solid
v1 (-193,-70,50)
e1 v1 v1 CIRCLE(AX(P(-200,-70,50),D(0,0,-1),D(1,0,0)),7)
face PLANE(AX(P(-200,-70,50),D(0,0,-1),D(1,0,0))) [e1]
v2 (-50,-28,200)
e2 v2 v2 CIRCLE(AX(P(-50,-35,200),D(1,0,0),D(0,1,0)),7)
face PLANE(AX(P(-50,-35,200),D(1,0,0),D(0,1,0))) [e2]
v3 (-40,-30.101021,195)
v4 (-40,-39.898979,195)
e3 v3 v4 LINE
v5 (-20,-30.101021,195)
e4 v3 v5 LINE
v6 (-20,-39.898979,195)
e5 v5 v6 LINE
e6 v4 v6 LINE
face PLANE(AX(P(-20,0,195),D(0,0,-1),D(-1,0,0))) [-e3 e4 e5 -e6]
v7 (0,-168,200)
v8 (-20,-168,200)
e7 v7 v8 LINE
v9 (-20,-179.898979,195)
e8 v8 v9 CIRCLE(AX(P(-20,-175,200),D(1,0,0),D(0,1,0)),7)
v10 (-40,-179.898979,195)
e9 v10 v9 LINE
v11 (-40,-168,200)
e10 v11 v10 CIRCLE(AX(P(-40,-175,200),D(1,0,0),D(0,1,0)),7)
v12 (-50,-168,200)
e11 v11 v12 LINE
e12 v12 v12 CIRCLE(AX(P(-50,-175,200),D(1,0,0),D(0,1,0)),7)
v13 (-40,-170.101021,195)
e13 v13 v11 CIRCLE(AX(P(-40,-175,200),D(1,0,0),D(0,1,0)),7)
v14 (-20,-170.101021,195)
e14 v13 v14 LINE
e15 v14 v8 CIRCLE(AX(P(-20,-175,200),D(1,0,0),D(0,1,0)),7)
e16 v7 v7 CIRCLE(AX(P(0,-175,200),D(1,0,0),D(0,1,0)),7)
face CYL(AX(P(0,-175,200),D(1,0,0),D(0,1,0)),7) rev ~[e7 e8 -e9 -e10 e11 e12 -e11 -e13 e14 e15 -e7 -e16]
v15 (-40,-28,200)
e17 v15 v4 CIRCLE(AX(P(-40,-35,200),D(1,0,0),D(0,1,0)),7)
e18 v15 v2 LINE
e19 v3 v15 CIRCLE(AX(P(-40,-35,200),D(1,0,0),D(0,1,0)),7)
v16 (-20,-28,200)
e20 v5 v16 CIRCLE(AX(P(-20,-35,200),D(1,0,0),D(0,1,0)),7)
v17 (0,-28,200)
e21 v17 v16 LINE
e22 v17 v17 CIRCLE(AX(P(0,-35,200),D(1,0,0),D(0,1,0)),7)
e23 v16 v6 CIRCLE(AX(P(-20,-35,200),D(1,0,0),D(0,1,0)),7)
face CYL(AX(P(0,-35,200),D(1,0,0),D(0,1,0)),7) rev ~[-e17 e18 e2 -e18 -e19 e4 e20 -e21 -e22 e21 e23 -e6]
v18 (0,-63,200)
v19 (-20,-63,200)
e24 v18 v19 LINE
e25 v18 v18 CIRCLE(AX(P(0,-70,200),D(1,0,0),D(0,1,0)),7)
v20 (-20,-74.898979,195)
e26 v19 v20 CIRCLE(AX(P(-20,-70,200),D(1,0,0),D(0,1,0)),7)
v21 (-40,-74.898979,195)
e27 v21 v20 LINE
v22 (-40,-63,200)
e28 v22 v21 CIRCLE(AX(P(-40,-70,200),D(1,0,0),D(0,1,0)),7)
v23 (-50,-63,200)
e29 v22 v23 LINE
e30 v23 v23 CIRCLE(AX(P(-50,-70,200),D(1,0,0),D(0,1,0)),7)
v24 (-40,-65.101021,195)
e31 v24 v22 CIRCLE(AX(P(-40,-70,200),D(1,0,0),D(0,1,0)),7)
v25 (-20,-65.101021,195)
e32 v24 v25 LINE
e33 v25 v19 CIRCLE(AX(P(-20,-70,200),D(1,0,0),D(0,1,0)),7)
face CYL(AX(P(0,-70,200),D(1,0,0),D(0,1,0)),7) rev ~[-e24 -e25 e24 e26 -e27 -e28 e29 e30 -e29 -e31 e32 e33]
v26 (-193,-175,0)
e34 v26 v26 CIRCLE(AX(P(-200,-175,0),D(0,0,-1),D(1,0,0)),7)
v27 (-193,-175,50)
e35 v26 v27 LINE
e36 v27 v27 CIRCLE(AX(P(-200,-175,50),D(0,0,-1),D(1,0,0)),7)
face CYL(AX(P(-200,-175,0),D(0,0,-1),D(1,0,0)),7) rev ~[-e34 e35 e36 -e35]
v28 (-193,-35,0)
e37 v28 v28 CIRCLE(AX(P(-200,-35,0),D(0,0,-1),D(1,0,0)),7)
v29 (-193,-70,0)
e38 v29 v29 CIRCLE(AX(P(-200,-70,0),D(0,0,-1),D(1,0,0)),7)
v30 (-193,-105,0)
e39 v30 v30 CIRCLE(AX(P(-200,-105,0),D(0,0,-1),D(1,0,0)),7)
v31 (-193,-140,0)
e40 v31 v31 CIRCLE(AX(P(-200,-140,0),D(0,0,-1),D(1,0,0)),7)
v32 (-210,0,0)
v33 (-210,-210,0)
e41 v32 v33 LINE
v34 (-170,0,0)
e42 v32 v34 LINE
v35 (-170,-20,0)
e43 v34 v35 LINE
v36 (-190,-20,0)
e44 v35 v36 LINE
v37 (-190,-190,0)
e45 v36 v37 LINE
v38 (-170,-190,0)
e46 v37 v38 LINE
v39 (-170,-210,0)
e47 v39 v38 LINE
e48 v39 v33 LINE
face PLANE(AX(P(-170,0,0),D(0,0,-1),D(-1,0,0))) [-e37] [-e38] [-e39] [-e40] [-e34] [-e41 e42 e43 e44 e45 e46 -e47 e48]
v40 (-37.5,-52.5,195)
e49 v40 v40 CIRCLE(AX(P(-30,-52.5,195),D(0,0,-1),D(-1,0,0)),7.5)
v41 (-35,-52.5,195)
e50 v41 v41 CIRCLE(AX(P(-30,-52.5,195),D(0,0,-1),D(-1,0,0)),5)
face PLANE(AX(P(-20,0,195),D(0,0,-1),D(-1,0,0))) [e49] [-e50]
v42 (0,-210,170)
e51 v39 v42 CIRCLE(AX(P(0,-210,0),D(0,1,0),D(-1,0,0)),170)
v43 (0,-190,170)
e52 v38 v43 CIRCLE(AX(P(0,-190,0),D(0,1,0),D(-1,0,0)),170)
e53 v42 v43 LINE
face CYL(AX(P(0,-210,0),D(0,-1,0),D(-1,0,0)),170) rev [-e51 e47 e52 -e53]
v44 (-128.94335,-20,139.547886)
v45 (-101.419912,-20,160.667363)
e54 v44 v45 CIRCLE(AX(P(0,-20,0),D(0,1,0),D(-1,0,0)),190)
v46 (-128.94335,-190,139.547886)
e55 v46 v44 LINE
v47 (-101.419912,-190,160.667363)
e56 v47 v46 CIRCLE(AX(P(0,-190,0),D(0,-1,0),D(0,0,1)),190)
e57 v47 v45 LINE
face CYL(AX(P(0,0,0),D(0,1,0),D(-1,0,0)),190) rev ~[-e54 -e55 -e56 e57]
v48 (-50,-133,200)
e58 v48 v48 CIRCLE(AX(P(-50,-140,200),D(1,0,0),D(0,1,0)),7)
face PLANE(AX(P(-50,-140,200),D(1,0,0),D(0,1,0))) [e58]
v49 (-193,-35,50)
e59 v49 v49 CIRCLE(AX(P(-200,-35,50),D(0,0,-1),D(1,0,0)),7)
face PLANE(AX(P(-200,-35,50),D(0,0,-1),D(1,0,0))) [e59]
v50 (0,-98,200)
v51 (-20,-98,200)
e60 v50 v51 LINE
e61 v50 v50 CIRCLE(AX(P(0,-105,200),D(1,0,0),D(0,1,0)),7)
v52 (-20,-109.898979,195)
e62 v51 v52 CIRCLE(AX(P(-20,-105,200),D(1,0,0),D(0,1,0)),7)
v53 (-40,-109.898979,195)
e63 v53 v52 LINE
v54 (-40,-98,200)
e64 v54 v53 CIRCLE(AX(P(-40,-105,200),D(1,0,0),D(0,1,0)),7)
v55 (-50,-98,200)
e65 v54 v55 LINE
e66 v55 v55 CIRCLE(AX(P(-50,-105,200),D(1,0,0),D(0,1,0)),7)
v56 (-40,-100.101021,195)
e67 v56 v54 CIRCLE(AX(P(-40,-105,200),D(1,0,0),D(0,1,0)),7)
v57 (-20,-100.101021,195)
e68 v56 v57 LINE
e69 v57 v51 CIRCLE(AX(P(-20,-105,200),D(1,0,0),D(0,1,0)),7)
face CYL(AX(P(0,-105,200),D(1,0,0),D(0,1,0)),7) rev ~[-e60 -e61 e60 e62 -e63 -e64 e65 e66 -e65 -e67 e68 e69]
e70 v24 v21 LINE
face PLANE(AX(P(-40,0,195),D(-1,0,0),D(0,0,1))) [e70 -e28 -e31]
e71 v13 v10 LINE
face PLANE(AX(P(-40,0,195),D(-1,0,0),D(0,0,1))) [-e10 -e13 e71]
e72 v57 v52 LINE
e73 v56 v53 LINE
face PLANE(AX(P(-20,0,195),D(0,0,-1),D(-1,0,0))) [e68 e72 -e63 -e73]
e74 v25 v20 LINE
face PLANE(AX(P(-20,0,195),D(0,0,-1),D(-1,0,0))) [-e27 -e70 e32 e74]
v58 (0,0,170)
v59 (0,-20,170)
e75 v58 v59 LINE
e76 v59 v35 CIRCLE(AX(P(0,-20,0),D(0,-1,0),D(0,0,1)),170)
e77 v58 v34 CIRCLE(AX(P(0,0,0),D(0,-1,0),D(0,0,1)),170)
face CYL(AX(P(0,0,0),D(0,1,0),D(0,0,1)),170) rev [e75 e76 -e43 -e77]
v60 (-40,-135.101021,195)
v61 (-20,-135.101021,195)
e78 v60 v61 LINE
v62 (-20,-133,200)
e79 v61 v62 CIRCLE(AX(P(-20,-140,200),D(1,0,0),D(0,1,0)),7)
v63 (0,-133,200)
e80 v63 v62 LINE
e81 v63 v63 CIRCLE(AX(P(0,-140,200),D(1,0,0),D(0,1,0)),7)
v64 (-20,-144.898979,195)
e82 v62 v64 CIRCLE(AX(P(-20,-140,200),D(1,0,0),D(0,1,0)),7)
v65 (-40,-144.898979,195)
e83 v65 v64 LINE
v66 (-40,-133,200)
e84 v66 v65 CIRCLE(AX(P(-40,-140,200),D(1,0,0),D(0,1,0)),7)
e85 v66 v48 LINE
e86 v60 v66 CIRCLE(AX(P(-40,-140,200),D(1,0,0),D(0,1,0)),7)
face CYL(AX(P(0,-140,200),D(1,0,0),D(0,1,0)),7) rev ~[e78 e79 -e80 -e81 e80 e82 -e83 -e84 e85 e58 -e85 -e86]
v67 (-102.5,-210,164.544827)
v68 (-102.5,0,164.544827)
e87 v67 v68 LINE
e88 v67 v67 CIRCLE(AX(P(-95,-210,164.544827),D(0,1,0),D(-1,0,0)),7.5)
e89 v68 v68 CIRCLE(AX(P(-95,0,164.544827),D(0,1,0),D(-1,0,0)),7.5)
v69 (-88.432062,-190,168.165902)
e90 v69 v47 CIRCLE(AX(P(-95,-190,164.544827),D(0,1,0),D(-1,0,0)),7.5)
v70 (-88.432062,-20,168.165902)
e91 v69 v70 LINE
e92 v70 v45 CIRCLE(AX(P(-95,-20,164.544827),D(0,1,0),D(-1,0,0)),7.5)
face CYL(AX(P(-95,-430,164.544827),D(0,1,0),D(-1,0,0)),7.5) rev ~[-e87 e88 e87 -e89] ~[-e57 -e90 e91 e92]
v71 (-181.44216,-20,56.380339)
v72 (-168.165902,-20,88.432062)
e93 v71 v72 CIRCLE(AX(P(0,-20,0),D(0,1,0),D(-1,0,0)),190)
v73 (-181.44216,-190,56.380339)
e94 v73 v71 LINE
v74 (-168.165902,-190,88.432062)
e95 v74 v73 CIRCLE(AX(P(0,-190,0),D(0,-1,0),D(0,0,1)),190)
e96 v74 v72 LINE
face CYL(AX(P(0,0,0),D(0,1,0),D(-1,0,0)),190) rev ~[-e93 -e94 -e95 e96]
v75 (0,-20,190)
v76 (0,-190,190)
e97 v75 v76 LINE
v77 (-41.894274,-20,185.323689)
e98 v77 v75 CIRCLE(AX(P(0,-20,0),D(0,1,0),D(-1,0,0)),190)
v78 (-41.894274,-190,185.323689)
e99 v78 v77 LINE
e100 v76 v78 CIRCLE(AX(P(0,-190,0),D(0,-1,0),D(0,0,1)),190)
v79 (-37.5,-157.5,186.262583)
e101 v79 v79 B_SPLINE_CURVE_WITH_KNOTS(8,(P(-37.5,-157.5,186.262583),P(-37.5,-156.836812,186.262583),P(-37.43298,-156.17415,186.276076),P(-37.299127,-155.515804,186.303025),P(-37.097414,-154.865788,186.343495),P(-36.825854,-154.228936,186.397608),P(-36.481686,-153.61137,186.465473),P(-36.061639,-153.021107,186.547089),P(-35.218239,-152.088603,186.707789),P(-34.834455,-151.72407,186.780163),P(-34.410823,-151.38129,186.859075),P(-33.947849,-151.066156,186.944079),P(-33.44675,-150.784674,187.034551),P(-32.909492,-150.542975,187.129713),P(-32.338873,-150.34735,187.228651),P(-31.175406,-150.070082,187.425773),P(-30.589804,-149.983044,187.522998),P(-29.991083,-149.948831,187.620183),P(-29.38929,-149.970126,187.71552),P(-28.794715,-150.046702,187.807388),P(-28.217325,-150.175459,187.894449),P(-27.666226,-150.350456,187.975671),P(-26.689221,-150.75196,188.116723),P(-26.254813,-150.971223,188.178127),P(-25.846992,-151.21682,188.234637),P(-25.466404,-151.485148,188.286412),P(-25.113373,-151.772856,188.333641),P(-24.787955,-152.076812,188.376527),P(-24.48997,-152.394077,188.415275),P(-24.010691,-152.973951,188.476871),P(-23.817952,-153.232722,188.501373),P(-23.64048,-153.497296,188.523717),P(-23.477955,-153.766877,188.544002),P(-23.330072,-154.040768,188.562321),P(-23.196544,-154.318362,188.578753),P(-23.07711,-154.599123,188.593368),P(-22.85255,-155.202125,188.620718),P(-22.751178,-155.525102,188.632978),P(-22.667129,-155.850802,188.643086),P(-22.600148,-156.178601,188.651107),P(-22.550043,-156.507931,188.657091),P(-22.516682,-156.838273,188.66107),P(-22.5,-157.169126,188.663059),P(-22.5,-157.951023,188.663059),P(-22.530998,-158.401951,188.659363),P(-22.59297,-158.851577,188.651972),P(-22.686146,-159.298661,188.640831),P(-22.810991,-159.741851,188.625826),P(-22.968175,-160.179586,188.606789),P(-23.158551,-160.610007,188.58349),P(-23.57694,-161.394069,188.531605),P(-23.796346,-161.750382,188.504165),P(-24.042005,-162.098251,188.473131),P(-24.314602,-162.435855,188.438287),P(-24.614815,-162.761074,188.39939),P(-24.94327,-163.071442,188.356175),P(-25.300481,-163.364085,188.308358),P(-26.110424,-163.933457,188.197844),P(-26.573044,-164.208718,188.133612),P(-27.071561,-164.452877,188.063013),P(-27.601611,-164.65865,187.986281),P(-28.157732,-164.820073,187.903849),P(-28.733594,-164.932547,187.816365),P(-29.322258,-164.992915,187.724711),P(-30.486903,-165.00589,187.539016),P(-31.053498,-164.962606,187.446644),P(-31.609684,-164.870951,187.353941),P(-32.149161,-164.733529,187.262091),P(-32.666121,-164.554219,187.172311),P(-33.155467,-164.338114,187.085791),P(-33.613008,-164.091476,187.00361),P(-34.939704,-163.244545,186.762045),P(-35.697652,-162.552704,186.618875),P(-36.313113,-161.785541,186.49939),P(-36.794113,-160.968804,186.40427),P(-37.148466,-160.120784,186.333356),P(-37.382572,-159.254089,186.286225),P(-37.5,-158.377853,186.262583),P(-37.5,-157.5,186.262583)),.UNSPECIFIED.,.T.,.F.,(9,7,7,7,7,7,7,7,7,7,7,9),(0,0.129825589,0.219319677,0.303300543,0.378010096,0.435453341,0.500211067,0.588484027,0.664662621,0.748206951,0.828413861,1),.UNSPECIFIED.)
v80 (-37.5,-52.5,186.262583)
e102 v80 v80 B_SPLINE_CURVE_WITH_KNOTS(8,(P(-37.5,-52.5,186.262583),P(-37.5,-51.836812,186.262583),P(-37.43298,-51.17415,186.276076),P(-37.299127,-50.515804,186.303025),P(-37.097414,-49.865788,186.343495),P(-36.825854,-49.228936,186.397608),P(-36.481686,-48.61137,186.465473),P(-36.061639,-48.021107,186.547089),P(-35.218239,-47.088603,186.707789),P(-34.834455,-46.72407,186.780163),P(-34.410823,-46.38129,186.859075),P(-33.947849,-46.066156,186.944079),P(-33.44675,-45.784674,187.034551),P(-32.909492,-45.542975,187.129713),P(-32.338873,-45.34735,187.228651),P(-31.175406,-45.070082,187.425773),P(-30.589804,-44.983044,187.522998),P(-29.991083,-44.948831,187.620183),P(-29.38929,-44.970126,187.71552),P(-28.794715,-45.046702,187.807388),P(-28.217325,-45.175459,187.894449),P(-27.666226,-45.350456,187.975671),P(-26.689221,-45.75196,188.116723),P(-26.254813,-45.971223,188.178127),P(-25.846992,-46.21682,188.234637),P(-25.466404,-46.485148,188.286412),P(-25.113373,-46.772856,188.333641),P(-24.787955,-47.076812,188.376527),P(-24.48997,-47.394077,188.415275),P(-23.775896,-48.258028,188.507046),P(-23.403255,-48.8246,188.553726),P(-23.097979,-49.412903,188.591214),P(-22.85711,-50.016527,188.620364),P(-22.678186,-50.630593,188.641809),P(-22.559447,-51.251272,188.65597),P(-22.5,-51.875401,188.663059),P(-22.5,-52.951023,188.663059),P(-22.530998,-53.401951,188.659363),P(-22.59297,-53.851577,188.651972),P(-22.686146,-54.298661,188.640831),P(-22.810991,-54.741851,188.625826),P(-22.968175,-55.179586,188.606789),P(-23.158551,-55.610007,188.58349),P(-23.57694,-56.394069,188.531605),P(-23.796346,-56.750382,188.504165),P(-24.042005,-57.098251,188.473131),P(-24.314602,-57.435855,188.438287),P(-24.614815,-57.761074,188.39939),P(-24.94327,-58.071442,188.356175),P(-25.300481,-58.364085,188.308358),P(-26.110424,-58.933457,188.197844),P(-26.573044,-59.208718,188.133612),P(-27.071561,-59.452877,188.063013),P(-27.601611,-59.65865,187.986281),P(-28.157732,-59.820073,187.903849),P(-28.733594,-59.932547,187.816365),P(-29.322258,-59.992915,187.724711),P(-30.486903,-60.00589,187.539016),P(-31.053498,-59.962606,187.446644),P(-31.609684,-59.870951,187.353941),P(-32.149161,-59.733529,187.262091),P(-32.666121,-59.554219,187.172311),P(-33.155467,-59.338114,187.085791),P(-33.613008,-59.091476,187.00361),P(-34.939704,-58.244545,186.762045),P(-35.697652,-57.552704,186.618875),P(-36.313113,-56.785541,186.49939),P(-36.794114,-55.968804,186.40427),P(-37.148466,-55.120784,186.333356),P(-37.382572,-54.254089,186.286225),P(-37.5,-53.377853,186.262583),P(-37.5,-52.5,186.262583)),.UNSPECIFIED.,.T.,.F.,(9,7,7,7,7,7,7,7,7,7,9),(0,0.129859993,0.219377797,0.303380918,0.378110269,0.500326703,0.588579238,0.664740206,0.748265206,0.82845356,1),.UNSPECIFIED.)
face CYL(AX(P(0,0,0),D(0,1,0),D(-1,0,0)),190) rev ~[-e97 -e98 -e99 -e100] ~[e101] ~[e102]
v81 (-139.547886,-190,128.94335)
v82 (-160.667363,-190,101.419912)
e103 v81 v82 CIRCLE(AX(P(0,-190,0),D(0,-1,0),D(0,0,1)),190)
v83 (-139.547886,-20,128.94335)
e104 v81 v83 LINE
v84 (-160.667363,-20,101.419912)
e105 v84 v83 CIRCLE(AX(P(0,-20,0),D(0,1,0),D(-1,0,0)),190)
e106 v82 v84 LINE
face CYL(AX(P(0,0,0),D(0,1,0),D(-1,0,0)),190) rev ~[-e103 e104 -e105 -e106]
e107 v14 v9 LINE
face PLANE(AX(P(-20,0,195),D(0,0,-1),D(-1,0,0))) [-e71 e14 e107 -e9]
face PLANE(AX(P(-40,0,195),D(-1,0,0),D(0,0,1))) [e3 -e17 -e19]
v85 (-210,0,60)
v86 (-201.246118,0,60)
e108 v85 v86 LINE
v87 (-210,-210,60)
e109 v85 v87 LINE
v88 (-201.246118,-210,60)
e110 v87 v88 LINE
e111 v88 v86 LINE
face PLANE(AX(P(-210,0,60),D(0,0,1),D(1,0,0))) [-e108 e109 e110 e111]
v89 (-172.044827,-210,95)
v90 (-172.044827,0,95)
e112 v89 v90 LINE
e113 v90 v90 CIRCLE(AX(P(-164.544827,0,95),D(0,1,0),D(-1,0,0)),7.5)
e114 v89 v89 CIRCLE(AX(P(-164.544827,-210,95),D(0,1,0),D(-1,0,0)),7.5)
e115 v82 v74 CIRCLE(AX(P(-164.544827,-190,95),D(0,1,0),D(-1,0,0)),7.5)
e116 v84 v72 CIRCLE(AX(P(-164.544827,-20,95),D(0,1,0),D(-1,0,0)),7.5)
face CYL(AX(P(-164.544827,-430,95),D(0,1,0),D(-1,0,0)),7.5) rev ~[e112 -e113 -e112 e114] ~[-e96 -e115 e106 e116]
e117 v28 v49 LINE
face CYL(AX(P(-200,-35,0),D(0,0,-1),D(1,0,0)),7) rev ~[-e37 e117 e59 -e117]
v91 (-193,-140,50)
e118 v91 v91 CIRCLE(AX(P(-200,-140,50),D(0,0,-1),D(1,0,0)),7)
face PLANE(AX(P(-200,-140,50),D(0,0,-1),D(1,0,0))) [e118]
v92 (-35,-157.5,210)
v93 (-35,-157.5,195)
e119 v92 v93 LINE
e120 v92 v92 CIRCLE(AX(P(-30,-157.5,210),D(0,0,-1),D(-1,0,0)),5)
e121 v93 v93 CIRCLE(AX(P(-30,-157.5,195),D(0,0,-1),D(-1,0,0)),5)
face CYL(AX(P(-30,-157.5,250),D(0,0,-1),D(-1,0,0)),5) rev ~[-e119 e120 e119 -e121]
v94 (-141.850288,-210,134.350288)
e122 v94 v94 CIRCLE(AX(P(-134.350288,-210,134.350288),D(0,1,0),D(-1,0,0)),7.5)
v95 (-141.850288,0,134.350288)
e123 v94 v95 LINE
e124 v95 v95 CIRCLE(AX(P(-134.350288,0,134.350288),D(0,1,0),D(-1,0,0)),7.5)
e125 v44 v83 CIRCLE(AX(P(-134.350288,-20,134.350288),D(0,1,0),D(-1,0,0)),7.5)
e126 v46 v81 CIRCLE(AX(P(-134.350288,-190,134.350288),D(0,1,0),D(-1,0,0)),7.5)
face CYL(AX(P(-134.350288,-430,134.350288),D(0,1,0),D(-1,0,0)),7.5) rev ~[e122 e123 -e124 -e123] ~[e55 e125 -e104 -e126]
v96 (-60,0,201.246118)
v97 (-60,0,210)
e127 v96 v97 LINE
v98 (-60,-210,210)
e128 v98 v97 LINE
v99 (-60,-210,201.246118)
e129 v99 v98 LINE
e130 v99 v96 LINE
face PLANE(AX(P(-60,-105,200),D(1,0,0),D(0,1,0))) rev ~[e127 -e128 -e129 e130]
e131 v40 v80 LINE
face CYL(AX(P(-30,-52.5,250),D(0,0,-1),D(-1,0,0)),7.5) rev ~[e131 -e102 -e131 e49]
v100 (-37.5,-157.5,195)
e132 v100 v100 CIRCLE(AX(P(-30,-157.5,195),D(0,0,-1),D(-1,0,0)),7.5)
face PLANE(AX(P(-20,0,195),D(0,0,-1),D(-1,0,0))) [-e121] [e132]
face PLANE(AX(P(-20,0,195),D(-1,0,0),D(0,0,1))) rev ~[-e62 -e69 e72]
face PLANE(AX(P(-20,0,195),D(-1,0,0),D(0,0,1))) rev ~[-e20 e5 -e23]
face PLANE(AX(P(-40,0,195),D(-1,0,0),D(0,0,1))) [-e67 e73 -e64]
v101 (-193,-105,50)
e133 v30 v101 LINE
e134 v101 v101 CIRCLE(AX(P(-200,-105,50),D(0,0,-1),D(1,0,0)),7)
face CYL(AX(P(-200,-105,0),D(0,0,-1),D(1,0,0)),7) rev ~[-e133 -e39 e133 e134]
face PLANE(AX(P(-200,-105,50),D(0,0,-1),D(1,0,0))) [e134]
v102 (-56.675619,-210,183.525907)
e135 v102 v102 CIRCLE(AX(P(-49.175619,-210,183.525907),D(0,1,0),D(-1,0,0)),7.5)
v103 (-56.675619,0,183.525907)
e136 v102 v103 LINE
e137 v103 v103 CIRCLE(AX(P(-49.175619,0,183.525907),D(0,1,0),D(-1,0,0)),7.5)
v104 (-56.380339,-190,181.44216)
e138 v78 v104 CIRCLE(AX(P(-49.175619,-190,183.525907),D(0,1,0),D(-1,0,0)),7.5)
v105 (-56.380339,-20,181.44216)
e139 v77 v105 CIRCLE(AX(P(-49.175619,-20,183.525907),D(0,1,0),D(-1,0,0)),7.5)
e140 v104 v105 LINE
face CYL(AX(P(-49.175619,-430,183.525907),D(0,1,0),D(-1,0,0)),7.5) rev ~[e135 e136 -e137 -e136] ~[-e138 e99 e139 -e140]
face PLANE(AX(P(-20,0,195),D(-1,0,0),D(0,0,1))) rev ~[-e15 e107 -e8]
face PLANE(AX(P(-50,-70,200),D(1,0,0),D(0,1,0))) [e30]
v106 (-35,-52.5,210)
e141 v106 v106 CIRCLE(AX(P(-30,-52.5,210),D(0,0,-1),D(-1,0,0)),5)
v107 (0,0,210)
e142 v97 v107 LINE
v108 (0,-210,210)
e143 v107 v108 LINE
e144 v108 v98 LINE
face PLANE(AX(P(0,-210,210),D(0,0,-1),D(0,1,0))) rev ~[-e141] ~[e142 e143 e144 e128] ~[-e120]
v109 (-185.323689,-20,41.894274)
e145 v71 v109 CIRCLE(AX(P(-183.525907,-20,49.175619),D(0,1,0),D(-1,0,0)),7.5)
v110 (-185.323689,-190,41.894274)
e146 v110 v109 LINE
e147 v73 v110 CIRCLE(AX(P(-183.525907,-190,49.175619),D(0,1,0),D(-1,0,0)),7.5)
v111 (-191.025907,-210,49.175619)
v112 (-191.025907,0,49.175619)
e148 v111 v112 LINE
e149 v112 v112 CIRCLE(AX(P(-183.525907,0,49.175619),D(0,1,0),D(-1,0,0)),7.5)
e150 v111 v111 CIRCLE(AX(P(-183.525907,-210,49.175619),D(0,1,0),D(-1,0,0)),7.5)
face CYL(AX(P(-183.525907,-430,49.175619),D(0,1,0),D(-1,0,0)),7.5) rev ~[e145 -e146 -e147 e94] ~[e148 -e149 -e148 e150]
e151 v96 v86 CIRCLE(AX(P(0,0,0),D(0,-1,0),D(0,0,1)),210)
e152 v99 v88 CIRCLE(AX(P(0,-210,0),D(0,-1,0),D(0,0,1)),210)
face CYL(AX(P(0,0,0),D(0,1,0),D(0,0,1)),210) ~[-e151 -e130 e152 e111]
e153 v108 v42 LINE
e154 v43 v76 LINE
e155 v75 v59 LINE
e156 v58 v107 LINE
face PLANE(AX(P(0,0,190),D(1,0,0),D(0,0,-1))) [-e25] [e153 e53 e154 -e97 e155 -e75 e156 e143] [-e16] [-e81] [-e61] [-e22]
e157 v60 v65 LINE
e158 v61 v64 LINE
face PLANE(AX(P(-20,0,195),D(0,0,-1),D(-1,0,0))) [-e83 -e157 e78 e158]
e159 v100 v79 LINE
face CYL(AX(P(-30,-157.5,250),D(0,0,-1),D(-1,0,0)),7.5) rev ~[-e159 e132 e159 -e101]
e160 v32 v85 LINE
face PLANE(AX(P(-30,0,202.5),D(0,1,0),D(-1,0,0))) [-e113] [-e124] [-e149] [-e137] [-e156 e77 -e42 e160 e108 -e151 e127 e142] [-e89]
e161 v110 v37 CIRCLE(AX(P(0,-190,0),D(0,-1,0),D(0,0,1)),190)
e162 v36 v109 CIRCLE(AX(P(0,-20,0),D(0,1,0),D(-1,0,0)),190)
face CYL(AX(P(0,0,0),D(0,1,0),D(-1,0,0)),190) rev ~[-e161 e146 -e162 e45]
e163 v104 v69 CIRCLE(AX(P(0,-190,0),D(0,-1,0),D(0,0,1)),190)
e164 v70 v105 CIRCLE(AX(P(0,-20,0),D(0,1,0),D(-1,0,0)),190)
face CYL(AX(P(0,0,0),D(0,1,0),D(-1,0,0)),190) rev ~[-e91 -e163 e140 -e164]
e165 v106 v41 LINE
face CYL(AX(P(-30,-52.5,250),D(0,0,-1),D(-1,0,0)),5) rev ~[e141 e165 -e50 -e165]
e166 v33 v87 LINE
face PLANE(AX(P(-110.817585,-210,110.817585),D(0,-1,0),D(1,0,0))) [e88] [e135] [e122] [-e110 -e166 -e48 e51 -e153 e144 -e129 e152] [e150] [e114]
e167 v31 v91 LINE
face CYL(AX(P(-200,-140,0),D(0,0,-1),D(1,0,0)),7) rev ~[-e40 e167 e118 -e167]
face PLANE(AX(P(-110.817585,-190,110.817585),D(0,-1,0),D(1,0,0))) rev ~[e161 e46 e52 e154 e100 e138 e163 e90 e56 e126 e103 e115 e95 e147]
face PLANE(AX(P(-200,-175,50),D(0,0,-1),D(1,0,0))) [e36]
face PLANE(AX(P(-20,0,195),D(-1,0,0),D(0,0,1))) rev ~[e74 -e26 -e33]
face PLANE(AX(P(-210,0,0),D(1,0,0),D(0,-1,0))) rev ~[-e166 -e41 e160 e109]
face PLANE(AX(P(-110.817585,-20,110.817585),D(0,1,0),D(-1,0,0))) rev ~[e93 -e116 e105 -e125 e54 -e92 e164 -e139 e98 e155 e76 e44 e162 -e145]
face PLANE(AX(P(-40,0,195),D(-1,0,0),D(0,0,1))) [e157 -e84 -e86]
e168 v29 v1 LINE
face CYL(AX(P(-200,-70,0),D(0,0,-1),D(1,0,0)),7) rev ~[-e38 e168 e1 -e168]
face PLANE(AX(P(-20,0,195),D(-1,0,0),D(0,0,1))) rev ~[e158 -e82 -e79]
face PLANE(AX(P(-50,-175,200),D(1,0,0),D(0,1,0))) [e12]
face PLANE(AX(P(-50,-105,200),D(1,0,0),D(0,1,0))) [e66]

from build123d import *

# Parameters (mm, degrees)
F1_DEPTH  = 210
F2_W      = 210
F2_H      = 20
F3_DEPTH  = 60
F4_DEPTH  = 60
F5_R      = 7
F6_DEPTH  = 50
F8_D      = 15
F8_DEPTH  = 40
F8_TIP    = 4.5064546427
F10_DEPTH = 20
F12_DEPTH = 20
F14_D     = 15
F14_DEPTH = 220
F14_TIP   = 4.5064546427
F15_W     = 20
F15_H     = 15
F16_DEPTH = 200
F17_D     = 10
F17_DEPTH = 40
F17_TIP   = 3.0043030951
F18_R     = 7
F19_DEPTH = 50


# Not quite as in the source:
# - a feature names something its author has since deleted; it is built from what else it names


with BuildPart() as f1:
    # F0 (on Front) → F1 (new body)
    with BuildSketch(Plane.XZ):
        with BuildLine():
            Line((0, 190), (0, 210))
            ThreePointArc((0, 210), (-148.4924240492, 148.4924240492), (-210, 0))
            Line((-210, 0), (-190, 0))
            ThreePointArc((-190, 0), (-134.3502884254, 134.3502884254), (0, 190))
        make_face()
    extrude(amount=F1_DEPTH)

    # F2 (on face) → F3 (join)
    with BuildSketch(Plane.YZ):
        with Locations((-105, 200)):
            Rectangle(F2_W, F2_H)
    extrude(amount=-F3_DEPTH)

    # F4 (add): a face of the model
    f4_faces = [f1.faces().sort_by_distance(p)[0] for p in [
        (-200, -105, 0),
    ]]
    extrude(f4_faces, amount=-F4_DEPTH)

    # F5 (on face) → F6 (cut)
    with BuildSketch(Plane.YZ):
        with Locations((-175, 200)):
            Circle(F5_R)
        with Locations((-140, 200)):
            Circle(F5_R)
        with Locations((-105, 200)):
            Circle(F5_R)
        with Locations((-70, 200)):
            Circle(F5_R)
        with Locations((-35, 200)):
            Circle(F5_R)
    extrude(amount=-F6_DEPTH, mode=Mode.SUBTRACT)

    # F8
    with Locations(Plane.XY.offset(210)):
        with Locations((-30, -157.5), (-30, -52.5)):
            Hole(F8_D / 2, depth=F8_DEPTH)
            with Locations((0, 0, -(F8_DEPTH + F8_TIP / 2))):  # 118° drill point
                Cone(0, F8_D / 2, F8_TIP, mode=Mode.SUBTRACT)

    # F9 (on face) → F10 (join)
    with BuildSketch(Plane.XZ.offset(210)):
        with BuildLine():
            ThreePointArc((-170, 0), (-120.2081528017, 120.2081528017), (0, 170))
            Line((0, 170), (0, 190))
            ThreePointArc((0, 190), (-134.3502884254, 134.3502884254), (-190, 0))
            Line((-190, 0), (-170, 0))
        make_face()
    extrude(amount=-F10_DEPTH)

    # F11 (on face) → F12 (join)
    with BuildSketch(Plane(origin=(0, 0, 0), x_dir=(-1, 0, 0), z_dir=(0, 1, 0))):
        with BuildLine():
            ThreePointArc((0, 170), (120.2081528017, 120.2081528017), (170, 0))
            Line((170, 0), (190, 0))
            ThreePointArc((190, 0), (134.3502884254, 134.3502884254), (0, 190))
            Line((0, 190), (0, 170))
        make_face()
    extrude(amount=-F12_DEPTH)

    # F14
    with Locations(Plane.XZ.offset(210)):
        with Locations((-183.5259069949, 49.1756185695), (-164.544826719, 95), (-134.3502884254, 134.3502884254), (-95, 164.544826719), (-49.1756185695, 183.5259069949)):
            Hole(F14_D / 2, depth=F14_DEPTH)
            with Locations((0, 0, -(F14_DEPTH + F14_TIP / 2))):  # 118° drill point
                Cone(0, F14_D / 2, F14_TIP, mode=Mode.SUBTRACT)

    # F15 (on face) → F16 (join)
    with BuildSketch(Plane(origin=(0, 0, 0), x_dir=(-1, 0, 0), z_dir=(0, 1, 0))):
        with Locations((30, 202.5)):
            Rectangle(F15_W, F15_H)
    extrude(amount=-F16_DEPTH)

    # F17
    with Locations(Plane.XY.offset(210)):
        with Locations((-30, -52.5), (-30, -157.5)):
            Hole(F17_D / 2, depth=F17_DEPTH)
            with Locations((0, 0, -(F17_DEPTH + F17_TIP / 2))):  # 118° drill point
                Cone(0, F17_D / 2, F17_TIP, mode=Mode.SUBTRACT)

    # F18 (on face) → F19 (cut)
    with BuildSketch(Plane(origin=(0, 0, 0), x_dir=(1, 0, 0), z_dir=(0, 0, -1))):
        with Locations((-200, 35)):
            Circle(F18_R)
        with Locations((-200, 70)):
            Circle(F18_R)
        with Locations((-200, 105)):
            Circle(F18_R)
        with Locations((-200, 140)):
            Circle(F18_R)
        with Locations((-200, 175)):
            Circle(F18_R)
    extrude(amount=-F19_DEPTH, mode=Mode.SUBTRACT)


solid = f1.part
